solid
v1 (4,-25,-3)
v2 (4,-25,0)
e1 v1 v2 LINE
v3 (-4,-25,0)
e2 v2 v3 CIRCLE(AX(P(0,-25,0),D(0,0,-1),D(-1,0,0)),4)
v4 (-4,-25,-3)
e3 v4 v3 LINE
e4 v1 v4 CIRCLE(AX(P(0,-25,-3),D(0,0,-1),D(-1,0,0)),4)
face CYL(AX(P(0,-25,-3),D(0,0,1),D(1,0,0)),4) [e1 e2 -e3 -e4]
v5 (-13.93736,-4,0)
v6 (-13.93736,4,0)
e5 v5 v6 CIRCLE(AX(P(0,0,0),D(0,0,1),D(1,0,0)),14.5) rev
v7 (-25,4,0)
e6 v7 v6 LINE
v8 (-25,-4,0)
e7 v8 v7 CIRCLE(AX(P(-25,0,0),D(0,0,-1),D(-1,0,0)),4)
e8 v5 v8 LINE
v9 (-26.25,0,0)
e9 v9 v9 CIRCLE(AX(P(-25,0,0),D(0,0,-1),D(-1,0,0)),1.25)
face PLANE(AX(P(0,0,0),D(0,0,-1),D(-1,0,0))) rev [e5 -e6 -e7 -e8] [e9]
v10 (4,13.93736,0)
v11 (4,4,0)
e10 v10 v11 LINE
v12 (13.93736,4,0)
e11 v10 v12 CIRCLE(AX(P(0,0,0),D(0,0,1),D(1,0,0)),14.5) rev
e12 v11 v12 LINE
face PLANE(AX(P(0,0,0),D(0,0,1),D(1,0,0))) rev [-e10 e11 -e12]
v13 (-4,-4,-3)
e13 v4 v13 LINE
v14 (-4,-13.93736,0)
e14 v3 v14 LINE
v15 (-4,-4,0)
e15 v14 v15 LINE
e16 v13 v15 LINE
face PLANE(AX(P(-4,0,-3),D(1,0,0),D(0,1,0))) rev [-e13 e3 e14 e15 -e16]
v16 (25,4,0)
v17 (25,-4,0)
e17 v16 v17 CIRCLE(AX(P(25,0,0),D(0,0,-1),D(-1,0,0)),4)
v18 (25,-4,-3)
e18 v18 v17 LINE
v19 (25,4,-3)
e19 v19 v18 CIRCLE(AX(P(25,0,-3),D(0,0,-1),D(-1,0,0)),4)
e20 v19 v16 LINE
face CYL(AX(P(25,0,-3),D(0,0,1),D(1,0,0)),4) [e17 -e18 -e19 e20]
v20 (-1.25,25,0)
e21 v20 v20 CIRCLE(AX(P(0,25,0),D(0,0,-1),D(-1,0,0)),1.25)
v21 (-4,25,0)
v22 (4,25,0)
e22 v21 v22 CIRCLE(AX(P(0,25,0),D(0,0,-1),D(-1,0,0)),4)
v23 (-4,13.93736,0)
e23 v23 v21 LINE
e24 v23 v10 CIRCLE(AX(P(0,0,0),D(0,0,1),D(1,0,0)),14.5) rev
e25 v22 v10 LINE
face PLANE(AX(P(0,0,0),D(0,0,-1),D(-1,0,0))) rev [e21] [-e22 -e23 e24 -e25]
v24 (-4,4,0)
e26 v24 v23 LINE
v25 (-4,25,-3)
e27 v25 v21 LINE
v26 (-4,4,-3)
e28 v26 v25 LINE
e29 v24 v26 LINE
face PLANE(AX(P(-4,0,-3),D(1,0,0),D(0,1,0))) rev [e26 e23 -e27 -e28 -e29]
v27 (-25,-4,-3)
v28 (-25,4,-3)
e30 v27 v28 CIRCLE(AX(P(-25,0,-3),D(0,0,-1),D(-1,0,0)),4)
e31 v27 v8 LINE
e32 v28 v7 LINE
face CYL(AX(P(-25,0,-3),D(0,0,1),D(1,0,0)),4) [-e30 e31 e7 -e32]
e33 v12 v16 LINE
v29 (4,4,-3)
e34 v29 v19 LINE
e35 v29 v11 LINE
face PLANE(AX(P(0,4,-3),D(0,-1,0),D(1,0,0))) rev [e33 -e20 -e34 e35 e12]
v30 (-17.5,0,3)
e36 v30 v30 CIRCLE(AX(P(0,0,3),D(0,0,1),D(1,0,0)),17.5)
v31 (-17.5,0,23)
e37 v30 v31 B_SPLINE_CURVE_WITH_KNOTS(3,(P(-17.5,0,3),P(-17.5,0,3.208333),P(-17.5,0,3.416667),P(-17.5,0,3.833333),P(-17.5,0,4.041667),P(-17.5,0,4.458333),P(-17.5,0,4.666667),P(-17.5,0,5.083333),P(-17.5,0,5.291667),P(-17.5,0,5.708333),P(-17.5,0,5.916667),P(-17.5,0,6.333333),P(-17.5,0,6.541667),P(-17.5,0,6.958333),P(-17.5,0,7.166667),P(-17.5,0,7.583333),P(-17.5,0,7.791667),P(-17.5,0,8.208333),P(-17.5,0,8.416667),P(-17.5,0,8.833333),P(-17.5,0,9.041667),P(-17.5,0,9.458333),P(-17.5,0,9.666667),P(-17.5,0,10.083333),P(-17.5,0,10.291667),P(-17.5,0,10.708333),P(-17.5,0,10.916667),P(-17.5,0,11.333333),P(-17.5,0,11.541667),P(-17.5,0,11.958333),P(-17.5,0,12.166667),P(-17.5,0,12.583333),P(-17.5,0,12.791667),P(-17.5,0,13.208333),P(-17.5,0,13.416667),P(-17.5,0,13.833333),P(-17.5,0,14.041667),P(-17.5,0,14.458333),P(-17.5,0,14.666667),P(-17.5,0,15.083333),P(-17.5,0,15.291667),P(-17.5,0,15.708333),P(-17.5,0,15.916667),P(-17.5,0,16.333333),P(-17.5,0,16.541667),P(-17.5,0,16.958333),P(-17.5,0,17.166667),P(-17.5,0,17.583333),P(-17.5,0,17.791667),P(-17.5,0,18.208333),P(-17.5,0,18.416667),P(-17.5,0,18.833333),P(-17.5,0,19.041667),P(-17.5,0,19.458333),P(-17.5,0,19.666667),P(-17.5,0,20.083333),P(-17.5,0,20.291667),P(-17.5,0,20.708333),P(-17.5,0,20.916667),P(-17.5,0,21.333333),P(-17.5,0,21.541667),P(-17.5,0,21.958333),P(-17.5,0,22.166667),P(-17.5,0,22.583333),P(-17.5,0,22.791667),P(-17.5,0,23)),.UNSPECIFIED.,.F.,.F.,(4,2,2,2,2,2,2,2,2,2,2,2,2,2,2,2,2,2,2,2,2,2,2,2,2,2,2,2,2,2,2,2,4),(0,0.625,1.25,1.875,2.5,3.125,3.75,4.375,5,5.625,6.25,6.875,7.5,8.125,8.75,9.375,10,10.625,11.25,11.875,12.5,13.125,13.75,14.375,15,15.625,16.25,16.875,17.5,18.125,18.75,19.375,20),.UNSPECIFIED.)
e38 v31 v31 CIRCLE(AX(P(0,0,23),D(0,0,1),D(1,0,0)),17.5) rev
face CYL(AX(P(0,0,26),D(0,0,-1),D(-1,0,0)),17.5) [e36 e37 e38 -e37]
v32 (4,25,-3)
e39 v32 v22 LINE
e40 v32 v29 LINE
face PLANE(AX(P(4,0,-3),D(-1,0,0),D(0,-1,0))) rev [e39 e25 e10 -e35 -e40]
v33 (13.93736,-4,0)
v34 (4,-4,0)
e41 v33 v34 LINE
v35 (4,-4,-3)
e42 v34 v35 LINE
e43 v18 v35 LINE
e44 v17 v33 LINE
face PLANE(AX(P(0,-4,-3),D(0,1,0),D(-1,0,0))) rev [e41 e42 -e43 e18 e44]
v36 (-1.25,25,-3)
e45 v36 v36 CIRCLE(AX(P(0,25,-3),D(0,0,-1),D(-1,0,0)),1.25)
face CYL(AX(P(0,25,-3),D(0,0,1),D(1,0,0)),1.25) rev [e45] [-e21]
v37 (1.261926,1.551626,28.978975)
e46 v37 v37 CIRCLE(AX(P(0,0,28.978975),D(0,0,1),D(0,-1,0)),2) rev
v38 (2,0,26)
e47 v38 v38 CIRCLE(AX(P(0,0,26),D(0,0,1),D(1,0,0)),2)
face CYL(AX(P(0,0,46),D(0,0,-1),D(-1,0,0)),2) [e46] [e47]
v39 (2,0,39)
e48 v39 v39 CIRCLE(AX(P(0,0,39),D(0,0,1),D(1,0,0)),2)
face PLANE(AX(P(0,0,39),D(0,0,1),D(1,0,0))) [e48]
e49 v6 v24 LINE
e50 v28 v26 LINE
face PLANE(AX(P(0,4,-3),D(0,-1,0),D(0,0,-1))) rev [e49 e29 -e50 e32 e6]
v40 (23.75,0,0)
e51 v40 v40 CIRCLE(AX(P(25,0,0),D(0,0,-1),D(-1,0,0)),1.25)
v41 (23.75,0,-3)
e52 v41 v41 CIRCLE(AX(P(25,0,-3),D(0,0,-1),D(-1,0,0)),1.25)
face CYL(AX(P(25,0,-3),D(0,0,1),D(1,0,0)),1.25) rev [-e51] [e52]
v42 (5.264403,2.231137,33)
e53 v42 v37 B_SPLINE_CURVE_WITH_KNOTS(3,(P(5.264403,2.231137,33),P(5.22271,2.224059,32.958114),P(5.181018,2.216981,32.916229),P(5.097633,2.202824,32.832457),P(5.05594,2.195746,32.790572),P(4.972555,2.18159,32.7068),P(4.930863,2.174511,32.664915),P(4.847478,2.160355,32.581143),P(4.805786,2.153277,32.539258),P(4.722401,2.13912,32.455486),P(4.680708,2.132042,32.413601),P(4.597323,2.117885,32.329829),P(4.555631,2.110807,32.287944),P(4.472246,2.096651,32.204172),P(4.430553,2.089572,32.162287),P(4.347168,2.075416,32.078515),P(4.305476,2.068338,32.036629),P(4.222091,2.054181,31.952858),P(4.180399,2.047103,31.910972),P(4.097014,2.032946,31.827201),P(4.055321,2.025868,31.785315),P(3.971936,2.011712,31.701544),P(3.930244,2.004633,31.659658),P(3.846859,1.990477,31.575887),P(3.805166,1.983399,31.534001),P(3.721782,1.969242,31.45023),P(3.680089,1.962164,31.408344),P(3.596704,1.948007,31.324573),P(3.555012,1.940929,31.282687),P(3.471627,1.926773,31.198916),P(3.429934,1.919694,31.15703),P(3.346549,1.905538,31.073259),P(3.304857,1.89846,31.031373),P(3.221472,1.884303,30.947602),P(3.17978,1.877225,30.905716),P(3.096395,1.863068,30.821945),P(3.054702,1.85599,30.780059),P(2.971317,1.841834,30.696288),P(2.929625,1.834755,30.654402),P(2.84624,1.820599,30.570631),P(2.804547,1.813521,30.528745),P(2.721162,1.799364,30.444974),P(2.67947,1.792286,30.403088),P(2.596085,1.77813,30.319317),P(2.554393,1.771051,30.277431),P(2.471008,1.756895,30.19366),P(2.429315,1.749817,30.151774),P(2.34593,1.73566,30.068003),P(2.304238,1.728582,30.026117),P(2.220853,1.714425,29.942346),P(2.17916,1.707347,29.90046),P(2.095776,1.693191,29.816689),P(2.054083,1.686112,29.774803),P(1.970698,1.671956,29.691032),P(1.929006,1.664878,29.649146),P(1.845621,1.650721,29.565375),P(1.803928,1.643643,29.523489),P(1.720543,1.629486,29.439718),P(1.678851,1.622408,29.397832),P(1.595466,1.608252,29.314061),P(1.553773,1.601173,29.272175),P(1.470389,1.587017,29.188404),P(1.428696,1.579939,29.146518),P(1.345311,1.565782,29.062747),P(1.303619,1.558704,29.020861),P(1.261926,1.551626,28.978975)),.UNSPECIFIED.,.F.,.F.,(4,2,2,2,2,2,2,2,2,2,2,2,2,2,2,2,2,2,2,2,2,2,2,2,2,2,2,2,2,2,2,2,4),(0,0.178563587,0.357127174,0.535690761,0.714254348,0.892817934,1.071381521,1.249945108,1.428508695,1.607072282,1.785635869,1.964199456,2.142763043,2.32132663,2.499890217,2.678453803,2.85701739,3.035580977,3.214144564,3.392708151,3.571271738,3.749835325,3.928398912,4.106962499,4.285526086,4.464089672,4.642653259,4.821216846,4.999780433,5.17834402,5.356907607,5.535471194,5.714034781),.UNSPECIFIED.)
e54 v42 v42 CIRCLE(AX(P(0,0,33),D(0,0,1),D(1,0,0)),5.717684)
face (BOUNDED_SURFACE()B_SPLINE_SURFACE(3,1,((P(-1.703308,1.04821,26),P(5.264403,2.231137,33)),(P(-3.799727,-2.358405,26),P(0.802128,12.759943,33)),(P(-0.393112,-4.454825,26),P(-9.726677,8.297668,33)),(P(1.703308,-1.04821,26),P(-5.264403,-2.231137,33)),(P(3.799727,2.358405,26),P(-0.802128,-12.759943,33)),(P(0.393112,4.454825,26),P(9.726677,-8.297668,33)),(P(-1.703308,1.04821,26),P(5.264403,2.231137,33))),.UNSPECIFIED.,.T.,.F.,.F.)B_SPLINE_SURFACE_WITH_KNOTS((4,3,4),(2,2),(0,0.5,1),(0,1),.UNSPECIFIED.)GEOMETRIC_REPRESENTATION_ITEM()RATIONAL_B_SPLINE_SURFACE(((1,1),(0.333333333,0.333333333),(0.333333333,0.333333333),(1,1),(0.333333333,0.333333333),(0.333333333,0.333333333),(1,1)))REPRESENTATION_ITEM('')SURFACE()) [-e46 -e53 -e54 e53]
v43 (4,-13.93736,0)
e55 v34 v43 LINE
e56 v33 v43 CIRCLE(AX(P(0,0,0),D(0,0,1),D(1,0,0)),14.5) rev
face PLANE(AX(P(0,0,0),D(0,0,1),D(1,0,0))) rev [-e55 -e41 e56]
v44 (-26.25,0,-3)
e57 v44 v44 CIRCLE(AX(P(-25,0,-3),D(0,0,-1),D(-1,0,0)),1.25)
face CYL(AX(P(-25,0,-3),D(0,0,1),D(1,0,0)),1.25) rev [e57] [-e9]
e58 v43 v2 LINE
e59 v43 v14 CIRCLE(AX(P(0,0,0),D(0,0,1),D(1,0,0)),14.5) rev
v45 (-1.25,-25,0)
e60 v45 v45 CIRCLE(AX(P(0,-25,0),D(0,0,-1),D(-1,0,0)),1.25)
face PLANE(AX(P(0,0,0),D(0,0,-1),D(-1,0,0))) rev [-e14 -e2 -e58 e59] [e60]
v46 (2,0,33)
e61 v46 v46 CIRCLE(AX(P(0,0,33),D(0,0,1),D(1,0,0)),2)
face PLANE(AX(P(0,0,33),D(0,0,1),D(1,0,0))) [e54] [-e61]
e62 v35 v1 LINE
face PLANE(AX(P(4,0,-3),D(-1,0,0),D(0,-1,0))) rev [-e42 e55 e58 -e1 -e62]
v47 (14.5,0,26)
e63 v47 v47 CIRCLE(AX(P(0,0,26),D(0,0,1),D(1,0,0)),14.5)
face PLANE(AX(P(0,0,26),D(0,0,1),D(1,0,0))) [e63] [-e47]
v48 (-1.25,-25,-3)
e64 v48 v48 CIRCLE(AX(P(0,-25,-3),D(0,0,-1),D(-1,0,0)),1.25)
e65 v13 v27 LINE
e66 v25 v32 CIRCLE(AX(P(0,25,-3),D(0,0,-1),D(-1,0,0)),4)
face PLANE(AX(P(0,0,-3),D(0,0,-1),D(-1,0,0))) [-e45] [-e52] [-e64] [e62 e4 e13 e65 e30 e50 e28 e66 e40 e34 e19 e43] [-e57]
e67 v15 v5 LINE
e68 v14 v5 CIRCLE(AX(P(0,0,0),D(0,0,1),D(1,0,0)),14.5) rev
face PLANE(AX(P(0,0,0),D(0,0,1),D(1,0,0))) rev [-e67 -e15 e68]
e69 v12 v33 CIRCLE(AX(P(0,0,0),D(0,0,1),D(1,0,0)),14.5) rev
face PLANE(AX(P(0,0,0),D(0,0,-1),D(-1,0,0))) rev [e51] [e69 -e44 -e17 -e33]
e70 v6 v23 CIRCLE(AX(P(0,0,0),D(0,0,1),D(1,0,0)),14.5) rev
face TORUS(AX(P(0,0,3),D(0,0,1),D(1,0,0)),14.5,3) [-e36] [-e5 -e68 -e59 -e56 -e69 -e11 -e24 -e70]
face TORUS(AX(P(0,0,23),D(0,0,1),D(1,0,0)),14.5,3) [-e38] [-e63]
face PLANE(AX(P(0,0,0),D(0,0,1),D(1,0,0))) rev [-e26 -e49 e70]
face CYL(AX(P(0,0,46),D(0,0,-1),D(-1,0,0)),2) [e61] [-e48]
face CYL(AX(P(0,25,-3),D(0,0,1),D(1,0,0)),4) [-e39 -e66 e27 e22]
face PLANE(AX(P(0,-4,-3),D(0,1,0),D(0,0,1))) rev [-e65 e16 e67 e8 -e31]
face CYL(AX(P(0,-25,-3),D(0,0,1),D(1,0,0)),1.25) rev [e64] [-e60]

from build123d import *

# Parameters (mm, degrees)
ESQUISSE1_R             = 17.5
BOSS_EXTRU_1_DEPTH      = 26
CONG_1_R                = 3
ESQUISSE2_R             = 2
BOSS_EXTRU_2_DEPTH      = 20
ESQUISSE3_R             = 2.5
BOSS_EXTRU_3_DEPTH      = 5
CONG_5_R                = 1
ESQUISSE6_R             = 4.037593864
ENL_V_MAT_EXTRU_1_DEPTH = 7
ESQUISSE7_R             = 1.25
BOSS_EXTRU_4_DEPTH      = 3
ESQUISSE9_R             = 1.25
BOSS_EXTRU_5_DEPTH      = 3
ESQUISSE10_R            = 1.25
BOSS_EXTRU_6_DEPTH      = 3
ESQUISSE11_R            = 1.25
BOSS_EXTRU_7_DEPTH      = 3
ESQUISSE12_R            = 7.076094554
ENL_V_MAT_EXTRU_3_DEPTH = 32


with BuildPart() as part:
    # Esquisse1 → Boss.-Extru.1 (new body)
    with BuildSketch(Plane.XY):
        with Locations(Location((0, 0, 0), (0, 0, 180))):
            Circle(ESQUISSE1_R)
    extrude(amount=BOSS_EXTRU_1_DEPTH)

    # Congé1
    cong_1_edges = [part.edges().sort_by_distance(p)[0] for p in [
        (17.5, 0, 0),
        (17.5, 0, 26),
    ]]
    fillet(cong_1_edges, radius=CONG_1_R)

    # Esquisse2 → Boss.-Extru.2 (add)
    with BuildSketch(Plane.XY.offset(26)):
        Circle(ESQUISSE2_R)
    extrude(amount=BOSS_EXTRU_2_DEPTH)

    # Esquisse3 → Boss.-Extru.3 (add)
    with BuildSketch(Plane(origin=(0, 0, 0), x_dir=(-1, 0, 0), z_dir=(0, 0, -1))):
        with Locations(Location((0, 0, 0), (0, 0, 180))):
            Circle(ESQUISSE3_R)
    extrude(amount=BOSS_EXTRU_3_DEPTH)

    # Congé5
    cong_5_edges = [part.edges().sort_by_distance(p)[0] for p in [
        (-2.5, 0, -5),
    ]]
    fillet(cong_5_edges, radius=CONG_5_R)

    # Lissage1: read off the stored shape, not the designer's step
    # Lissage1: loft between two sections, ruled curve by curve
    lissage1_from = [
        Edge.make_bspline([(-1.703307527, 1.048209649, 26), (-3.799726825, -2.358405406, 26), (-0.39311177, -4.454824703, 26), (1.703307527, -1.048209649, 26), (3.799726825, 2.358405406, 26), (0.39311177, 4.454824703, 26), (-1.703307527, 1.048209649, 26)], [0, 0, 0, 0, 0.5, 0.5, 0.5, 1, 1, 1, 1], 3, [1, 0.333333333, 0.333333333, 1, 0.333333333, 0.333333333, 1]),
    ]
    lissage1_to = [
        Edge.make_bspline([(5.264402681, 2.231137224, 33), (0.802128233, 12.759942587, 33), (-9.72667713, 8.297668139, 33), (-5.264402681, -2.231137224, 33), (-0.802128233, -12.759942587, 33), (9.72667713, -8.297668139, 33), (5.264402681, 2.231137224, 33)], [0, 0, 0, 0, 0.5, 0.5, 0.5, 1, 1, 1, 1], 3, [1, 0.333333333, 0.333333333, 1, 0.333333333, 0.333333333, 1]),
    ]
    lissage1 = Solid(Shell([*[Face.make_surface_from_curves(lissage1_from[k], lissage1_to[k]) for k in range(1)], Face(Wire(lissage1_from)), Face(Wire(lissage1_to))]))
    add(lissage1)

    # Esquisse6 → Enlèv. mat.-Extru.1 (cut)
    with BuildSketch(Plane.XY.offset(46)):
        Circle(ESQUISSE6_R)
    extrude(amount=-ENL_V_MAT_EXTRU_1_DEPTH, mode=Mode.SUBTRACT)

    # Esquisse7 → Boss.-Extru.4 (add)
    with BuildSketch(Plane(origin=(0, 0, 0), x_dir=(-1, 0, 0), z_dir=(0, 0, -1))):
        with BuildLine():
            Line((4, 0), (4, -25))
            ThreePointArc((4, -25), (0, -29), (-4, -25))
            Line((-4, -25), (-4, 0))
            ThreePointArc((-4, 0), (0, 4), (4, 0))
        make_face()
        with Locations((0, -25)):
            Circle(ESQUISSE7_R, mode=Mode.SUBTRACT)
    extrude(amount=BOSS_EXTRU_4_DEPTH)

    # Esquisse9 → Boss.-Extru.5 (add)
    with BuildSketch(Plane(origin=(0, 0, 0), x_dir=(-1, 0, 0), z_dir=(0, 0, -1))):
        with BuildLine():
            Line((-4, 0), (-4, 25))
            ThreePointArc((-4, 25), (0, 29), (4, 25))
            Line((4, 25), (4, 0))
            ThreePointArc((4, 0), (0, -4), (-4, 0))
        make_face()
        with Locations((0, 25)):
            Circle(ESQUISSE9_R, mode=Mode.SUBTRACT)
    extrude(amount=BOSS_EXTRU_5_DEPTH)

    # Esquisse10 → Boss.-Extru.6 (add)
    with BuildSketch(Plane(origin=(0, 0, 0), x_dir=(-1, 0, 0), z_dir=(0, 0, -1))):
        with BuildLine():
            Line((0, -4), (-25, -4))
            ThreePointArc((-25, -4), (-29, 0), (-25, 4))
            Line((-25, 4), (0, 4))
            ThreePointArc((0, 4), (4, 0), (0, -4))
        make_face()
        with Locations((-25, 0)):
            Circle(ESQUISSE10_R, mode=Mode.SUBTRACT)
    extrude(amount=BOSS_EXTRU_6_DEPTH)

    # Esquisse11 → Boss.-Extru.7 (add)
    with BuildSketch(Plane(origin=(0, 0, 0), x_dir=(-1, 0, 0), z_dir=(0, 0, -1))):
        with BuildLine():
            Line((0, 4), (25, 4))
            ThreePointArc((25, 4), (29, 0), (25, -4))
            Line((25, -4), (0, -4))
            ThreePointArc((0, -4), (-4, 0), (0, 4))
        make_face()
        with Locations((25, 0)):
            Circle(ESQUISSE11_R, mode=Mode.SUBTRACT)
    extrude(amount=BOSS_EXTRU_7_DEPTH)

    # Esquisse12 → Enlèv. mat.-Extru.3 (cut)
    with BuildSketch(Plane(origin=(0, 0, -3), x_dir=(-1, 0, 0), z_dir=(0, 0, -1))):
        Circle(ESQUISSE12_R)
    extrude(amount=ENL_V_MAT_EXTRU_3_DEPTH, mode=Mode.SUBTRACT)


solid = part.part
